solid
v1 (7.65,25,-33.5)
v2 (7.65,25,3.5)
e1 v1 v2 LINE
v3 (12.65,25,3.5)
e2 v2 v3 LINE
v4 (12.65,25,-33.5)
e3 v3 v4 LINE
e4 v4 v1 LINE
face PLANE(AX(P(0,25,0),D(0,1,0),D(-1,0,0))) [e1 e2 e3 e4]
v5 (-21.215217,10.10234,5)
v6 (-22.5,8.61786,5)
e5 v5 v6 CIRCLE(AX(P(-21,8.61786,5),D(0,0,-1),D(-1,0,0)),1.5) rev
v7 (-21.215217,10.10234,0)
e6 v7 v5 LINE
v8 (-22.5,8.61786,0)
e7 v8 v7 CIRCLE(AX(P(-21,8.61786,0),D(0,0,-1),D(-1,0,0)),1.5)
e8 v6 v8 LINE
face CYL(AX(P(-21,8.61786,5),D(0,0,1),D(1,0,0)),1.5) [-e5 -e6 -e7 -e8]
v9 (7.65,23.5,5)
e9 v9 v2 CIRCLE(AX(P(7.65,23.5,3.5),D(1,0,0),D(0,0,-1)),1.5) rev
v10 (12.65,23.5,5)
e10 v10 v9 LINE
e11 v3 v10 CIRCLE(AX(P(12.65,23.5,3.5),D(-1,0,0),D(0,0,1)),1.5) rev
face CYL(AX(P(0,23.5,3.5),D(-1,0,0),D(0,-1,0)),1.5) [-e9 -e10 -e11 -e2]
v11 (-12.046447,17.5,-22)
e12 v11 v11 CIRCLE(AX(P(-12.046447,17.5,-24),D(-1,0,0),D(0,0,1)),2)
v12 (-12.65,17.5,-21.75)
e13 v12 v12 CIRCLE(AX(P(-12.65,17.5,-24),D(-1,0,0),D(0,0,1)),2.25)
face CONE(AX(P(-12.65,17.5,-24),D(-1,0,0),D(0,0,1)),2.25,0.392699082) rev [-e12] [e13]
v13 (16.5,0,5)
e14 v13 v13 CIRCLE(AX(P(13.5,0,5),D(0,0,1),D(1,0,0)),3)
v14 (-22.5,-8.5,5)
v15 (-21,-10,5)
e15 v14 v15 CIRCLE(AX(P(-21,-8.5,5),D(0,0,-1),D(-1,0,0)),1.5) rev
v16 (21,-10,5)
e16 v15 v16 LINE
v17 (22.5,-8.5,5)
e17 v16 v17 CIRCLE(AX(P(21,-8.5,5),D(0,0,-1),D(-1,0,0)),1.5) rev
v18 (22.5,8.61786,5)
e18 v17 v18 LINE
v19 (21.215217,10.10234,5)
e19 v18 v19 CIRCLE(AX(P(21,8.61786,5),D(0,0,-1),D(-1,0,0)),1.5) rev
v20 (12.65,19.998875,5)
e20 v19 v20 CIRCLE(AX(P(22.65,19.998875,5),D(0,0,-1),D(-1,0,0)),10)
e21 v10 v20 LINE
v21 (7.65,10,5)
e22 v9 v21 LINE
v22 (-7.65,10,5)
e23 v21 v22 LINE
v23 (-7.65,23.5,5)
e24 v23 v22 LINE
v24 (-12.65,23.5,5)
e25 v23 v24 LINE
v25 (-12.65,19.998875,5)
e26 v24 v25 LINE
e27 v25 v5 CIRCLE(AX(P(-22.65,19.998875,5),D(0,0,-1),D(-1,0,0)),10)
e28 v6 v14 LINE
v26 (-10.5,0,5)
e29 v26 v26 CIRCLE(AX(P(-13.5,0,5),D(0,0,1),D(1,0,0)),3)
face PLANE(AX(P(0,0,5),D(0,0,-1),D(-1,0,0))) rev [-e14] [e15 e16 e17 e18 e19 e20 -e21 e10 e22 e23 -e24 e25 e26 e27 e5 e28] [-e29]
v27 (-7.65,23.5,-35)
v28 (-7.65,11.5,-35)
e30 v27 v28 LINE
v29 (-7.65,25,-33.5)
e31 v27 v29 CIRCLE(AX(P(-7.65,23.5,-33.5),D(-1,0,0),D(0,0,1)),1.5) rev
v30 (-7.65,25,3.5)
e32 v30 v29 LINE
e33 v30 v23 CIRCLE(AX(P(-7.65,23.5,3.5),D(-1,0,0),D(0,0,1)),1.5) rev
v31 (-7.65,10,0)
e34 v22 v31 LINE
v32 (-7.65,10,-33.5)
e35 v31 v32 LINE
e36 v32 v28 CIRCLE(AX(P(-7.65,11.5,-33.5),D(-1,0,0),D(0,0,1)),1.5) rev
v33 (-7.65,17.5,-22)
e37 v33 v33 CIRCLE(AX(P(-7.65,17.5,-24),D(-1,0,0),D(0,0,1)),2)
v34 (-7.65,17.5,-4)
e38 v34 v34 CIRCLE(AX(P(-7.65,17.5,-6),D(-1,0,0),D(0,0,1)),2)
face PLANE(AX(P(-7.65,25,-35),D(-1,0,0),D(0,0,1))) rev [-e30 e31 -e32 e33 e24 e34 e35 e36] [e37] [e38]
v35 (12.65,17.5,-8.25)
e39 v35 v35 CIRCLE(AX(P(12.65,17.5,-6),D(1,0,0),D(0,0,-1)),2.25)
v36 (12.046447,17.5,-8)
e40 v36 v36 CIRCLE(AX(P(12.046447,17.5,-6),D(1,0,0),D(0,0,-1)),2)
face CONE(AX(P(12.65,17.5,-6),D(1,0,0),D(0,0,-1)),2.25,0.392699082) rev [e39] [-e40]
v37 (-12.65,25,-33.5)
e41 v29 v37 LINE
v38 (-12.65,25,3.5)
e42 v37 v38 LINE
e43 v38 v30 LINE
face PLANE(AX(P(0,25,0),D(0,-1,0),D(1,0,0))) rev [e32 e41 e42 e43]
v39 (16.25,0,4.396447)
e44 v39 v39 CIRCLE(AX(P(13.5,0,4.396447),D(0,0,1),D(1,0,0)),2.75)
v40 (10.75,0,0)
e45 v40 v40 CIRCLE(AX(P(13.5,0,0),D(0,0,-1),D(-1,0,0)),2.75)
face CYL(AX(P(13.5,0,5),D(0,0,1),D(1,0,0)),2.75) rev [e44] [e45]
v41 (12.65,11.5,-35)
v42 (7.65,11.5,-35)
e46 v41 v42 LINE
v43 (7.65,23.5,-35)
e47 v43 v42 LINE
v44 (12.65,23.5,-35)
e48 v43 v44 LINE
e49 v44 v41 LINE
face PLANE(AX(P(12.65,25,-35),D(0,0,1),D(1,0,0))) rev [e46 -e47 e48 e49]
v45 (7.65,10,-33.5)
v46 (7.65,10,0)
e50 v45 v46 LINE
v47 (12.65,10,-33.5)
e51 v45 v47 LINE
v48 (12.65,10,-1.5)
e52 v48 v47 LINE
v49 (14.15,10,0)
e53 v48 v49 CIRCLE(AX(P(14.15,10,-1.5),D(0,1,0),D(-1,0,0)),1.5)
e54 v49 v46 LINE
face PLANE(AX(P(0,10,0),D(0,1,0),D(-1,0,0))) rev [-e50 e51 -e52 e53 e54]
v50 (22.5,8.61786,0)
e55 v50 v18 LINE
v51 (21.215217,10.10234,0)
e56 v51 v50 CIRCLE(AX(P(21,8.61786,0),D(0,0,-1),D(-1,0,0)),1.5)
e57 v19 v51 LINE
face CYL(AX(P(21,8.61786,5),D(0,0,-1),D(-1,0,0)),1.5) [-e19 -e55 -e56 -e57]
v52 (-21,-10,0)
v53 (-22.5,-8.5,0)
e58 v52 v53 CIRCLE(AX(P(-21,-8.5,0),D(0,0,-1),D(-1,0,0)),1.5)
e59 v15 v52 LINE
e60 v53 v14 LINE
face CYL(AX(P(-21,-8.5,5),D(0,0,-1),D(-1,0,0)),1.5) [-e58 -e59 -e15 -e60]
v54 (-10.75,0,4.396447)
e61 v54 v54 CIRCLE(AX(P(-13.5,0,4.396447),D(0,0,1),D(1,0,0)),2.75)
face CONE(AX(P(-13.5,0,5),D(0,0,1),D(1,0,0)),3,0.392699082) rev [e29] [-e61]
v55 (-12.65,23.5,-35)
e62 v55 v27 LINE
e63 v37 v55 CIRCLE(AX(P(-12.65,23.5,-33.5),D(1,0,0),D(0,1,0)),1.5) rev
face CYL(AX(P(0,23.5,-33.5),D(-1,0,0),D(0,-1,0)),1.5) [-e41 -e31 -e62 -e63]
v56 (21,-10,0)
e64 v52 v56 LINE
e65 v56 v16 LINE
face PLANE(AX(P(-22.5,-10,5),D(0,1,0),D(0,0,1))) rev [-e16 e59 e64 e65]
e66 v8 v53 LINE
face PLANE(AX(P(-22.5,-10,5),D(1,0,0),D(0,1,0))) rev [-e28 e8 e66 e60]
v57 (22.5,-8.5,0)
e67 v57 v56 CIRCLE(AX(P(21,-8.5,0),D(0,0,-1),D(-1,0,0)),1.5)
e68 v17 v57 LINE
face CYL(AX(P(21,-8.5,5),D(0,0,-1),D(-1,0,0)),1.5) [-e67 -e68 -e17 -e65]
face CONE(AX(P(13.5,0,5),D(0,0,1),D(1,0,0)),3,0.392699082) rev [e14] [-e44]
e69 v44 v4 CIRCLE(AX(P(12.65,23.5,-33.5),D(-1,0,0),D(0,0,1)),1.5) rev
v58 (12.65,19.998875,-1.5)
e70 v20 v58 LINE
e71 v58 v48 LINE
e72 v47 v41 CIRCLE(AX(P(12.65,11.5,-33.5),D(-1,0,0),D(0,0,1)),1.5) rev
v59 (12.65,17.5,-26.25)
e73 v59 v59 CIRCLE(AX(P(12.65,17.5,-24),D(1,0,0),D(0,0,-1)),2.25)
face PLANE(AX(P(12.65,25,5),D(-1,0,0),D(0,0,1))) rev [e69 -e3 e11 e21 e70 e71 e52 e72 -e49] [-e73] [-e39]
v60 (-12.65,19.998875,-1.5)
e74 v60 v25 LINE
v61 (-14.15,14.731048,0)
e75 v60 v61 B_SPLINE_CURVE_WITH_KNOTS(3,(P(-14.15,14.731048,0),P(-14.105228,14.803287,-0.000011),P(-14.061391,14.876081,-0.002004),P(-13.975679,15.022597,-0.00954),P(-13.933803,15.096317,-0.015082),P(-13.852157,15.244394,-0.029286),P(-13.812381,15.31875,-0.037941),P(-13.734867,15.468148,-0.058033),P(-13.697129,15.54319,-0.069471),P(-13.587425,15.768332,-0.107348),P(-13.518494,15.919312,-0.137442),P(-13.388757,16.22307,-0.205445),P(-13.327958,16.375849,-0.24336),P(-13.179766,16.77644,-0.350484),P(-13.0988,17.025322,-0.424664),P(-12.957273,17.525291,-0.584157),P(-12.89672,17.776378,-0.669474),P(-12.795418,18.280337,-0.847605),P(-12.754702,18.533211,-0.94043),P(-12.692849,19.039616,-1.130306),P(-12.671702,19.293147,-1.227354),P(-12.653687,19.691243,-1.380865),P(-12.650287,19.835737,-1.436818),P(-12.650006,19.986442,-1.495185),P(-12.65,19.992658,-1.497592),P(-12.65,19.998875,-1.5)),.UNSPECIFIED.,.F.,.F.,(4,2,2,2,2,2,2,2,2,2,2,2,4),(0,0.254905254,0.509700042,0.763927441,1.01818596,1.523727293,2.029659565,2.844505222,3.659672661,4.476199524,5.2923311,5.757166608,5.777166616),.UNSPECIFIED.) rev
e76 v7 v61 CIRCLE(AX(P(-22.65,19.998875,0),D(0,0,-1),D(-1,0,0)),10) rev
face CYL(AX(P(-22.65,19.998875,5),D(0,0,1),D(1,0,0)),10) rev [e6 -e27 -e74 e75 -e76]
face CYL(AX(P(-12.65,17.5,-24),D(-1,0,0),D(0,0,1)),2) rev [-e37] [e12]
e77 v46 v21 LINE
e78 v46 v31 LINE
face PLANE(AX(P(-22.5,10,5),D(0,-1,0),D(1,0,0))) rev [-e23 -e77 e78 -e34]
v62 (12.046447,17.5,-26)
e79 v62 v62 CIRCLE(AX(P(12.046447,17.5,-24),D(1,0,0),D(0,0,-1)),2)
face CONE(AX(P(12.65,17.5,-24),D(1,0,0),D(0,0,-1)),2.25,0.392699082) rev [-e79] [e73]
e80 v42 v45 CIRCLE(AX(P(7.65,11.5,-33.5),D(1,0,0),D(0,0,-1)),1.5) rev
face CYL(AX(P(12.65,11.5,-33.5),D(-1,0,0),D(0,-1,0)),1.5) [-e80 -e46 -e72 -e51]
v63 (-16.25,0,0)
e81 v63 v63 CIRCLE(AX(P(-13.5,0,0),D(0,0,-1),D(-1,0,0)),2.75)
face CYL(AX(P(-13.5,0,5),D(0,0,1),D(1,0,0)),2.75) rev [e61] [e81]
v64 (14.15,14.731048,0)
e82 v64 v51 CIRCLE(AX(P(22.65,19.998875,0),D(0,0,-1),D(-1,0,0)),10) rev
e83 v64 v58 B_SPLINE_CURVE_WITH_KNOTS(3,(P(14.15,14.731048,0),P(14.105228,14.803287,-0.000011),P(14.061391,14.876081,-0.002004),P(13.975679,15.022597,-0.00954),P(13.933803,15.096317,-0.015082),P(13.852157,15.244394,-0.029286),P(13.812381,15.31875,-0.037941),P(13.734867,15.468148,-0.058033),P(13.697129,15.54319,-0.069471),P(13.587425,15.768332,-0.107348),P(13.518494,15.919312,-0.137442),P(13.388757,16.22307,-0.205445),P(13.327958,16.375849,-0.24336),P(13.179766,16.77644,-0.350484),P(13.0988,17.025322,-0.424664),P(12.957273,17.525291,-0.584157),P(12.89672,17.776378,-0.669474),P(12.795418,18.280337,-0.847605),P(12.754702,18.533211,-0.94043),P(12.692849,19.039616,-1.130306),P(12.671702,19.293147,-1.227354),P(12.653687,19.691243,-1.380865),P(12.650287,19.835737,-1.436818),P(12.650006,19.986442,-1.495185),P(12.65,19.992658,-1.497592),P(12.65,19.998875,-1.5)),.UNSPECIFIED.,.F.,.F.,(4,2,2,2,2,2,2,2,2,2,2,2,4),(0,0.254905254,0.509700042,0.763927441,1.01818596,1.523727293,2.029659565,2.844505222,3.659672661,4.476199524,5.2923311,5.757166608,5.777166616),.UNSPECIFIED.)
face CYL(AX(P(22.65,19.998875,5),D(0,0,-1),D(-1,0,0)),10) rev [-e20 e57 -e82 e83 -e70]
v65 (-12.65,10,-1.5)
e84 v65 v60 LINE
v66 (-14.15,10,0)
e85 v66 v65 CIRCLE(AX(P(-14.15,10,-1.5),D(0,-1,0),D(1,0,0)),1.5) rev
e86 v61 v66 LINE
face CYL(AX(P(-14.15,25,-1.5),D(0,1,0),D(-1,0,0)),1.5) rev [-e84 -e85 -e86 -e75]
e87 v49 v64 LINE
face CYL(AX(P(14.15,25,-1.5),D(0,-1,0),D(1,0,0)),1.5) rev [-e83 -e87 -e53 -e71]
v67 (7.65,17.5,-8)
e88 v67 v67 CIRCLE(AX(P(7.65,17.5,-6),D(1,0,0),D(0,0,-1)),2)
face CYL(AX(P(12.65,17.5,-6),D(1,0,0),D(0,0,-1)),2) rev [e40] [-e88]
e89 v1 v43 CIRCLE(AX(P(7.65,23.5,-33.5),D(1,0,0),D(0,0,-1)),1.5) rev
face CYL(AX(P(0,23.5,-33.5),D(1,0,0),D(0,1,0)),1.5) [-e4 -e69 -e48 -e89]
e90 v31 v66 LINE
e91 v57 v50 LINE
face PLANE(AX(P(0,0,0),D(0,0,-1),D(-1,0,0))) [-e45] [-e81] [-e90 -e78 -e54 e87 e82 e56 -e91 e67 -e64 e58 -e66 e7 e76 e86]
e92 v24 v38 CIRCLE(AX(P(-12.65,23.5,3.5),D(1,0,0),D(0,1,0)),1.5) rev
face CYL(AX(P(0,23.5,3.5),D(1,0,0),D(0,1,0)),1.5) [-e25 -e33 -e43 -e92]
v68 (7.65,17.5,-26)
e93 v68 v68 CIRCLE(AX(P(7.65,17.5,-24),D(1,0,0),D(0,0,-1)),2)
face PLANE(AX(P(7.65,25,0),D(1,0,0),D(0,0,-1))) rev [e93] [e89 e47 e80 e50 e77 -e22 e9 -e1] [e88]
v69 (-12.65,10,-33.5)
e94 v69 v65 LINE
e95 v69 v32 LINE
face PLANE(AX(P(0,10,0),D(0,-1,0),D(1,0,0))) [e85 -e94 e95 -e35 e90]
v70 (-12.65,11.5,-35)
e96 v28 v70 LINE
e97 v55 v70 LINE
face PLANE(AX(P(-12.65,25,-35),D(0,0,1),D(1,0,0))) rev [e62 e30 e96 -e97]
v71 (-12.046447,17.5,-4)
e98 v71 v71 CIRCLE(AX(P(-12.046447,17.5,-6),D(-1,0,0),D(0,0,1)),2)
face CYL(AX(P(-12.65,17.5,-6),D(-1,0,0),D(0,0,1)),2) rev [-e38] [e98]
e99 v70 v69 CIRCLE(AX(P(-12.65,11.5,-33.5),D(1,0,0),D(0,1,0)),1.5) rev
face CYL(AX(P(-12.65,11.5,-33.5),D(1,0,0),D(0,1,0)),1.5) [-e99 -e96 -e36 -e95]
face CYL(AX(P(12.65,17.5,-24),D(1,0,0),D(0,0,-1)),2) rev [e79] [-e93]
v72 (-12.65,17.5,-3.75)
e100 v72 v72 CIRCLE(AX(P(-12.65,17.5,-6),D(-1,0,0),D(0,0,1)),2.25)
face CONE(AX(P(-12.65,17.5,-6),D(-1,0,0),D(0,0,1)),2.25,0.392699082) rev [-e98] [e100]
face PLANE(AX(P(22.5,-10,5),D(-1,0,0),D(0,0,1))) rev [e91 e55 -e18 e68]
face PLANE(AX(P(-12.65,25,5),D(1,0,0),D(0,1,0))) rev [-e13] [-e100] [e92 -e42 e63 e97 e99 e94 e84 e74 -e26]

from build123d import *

# Parameters (mm, degrees)
SKETCH1_W                           = 45
SKETCH1_H                           = 20
BOSS_EXTRUDE1_DEPTH                 = 5
BOSS_EXTRUDE2_DEPTH                 = 15
F_4_0_4_DIAMETER_HOLE1_AT_2_COUNT   = 2
F_4_0_4_DIAMETER_HOLE1_AT_2_PITCH   = 18
F_5_5_5_5_DIAMETER_HOLE2_AT_2_COUNT = 2
F_5_5_5_5_DIAMETER_HOLE2_AT_2_PITCH = 27
FILLET1_R                           = 10
FILLET2_R                           = 1.5


with BuildPart() as part:
    # Sketch1 → Boss-Extrude1 (new body)
    with BuildSketch(Plane.XY):
        Rectangle(SKETCH1_W, SKETCH1_H)
    extrude(amount=BOSS_EXTRUDE1_DEPTH)

    # Sketch3 → Boss-Extrude2 (add)
    with BuildSketch(Plane(origin=(0, 10, 0), x_dir=(1, 0, 0), z_dir=(0, 1, 0))):
        Polygon((-7.65, 0), (-7.65, -5), (-12.65, -5), (-12.65, 35), (-7.65, 35), align=None)
        Polygon((7.65, -5), (12.65, -5), (12.65, 35), (7.65, 35), (7.65, 0), align=None)
    extrude(amount=BOSS_EXTRUDE2_DEPTH)

    # Sketch8 → Ø4.0 (4) Diameter Hole1 (revolve, cut)
    with BuildSketch(Plane(origin=(-12.65, 17.5, -24), x_dir=(0, 0, 1), z_dir=(0, 1, 0))):
        Polygon((0, 0), (0, 5), (2, 5), (2, 0.603553391), (2.25, 0), align=None)
    f_4_0_4_diameter_hole1 = revolve(axis=Axis((-19, 17.5, -24), (1, 0, 0)), mode=Mode.SUBTRACT)

    # Ø4.0 (4) Diameter Hole1 at 2: Ø4.0 (4) Diameter Hole1 ×2
    with Locations(*[(0, 0, i * F_4_0_4_DIAMETER_HOLE1_AT_2_PITCH) for i in range(1, F_4_0_4_DIAMETER_HOLE1_AT_2_COUNT)]):
        add(f_4_0_4_diameter_hole1, mode=Mode.SUBTRACT)

    # Mirror3: Ø4.0 (4) Diameter Hole1 across plane
    add(f_4_0_4_diameter_hole1.mirror(Plane(origin=(0, 0, 0), x_dir=(0, 0, 1), z_dir=(1, 0, 0))), mode=Mode.SUBTRACT)

    # Mirror3 copy 1 sketch → Mirror3 copy 1 (revolve, cut)
    with BuildSketch(Plane(origin=(12.65, 17.5, -6), x_dir=(0, 0, 1), z_dir=(0, 1, 0))):
        Polygon((0, 0), (0, -5), (2, -5), (2, -0.603553391), (2.25, 0), align=None)
    revolve(axis=Axis((19, 17.5, -6), (1, 0, 0)), mode=Mode.SUBTRACT)

    # Sketch12 → Ø5.5 (5.5) Diameter Hole2 (revolve, cut)
    with BuildSketch(Plane(origin=(13.5, 0, 5), x_dir=(0, -1, 0), z_dir=(1, 0, 0))):
        Polygon((0, 0), (0, 5), (2.75, 5), (2.75, 0.603553391), (3, 0), align=None)
    f_5_5_5_5_diameter_hole2 = revolve(axis=Axis((13.5, 0, 11.35), (0, 0, -1)), mode=Mode.SUBTRACT)

    # Ø5.5 (5.5) Diameter Hole2 at 2: Ø5.5 (5.5) Diameter Hole2 ×2
    with Locations(*[(-i * F_5_5_5_5_DIAMETER_HOLE2_AT_2_PITCH, 0, 0) for i in range(1, F_5_5_5_5_DIAMETER_HOLE2_AT_2_COUNT)]):
        add(f_5_5_5_5_diameter_hole2, mode=Mode.SUBTRACT)

    # Fillet1
    # the kernel refuses this fillet: 10 mm, written as the material it adds along each edge
    with BuildSketch(Plane(origin=(12.65, 10, 5), x_dir=(1, 0, 0), z_dir=(0, 0, -1))) as fillet1_piece_1:
        with BuildLine():
            CenterArc((10, -9.998874937), FILLET1_R, 90.859468925, 89.140531075)
            Line((0, -9.998874937), (0, 0))
            Line((0, 0), (9.85, 0))
        make_face()
    extrude(amount=5)
    with BuildSketch(Plane(origin=(-12.65, 10, 5), x_dir=(-1, 0, 0), z_dir=(0, 0, -1))) as fillet1_piece_2:
        with BuildLine():
            CenterArc((10, 9.998874937), FILLET1_R, 180, 89.140531075)
            Line((0, 9.998874937), (0, 0))
            Line((0, 0), (9.85, 0))
        make_face()
    extrude(amount=5)

    # Fillet2
    fillet2_edges = [part.edges().sort_by_distance(p)[0] for p in [
        (-10.15, 10, -35),
        (-10.15, 25, -35),
        (-10.15, 25, 5),
        (10.15, 10, -35),
        (10.15, 25, 5),
        (10.15, 25, -35),
        (22.5, -10, 2.5),
        (-22.5, -10, 2.5),
        (-22.5, 10, 2.5),
        (22.5, 10, 2.5),
        (12.65, 14.999437468, 0),
        (-12.65, 14.999437468, 0),
    ]]
    fillet(fillet2_edges, radius=FILLET2_R)


solid = part.part
